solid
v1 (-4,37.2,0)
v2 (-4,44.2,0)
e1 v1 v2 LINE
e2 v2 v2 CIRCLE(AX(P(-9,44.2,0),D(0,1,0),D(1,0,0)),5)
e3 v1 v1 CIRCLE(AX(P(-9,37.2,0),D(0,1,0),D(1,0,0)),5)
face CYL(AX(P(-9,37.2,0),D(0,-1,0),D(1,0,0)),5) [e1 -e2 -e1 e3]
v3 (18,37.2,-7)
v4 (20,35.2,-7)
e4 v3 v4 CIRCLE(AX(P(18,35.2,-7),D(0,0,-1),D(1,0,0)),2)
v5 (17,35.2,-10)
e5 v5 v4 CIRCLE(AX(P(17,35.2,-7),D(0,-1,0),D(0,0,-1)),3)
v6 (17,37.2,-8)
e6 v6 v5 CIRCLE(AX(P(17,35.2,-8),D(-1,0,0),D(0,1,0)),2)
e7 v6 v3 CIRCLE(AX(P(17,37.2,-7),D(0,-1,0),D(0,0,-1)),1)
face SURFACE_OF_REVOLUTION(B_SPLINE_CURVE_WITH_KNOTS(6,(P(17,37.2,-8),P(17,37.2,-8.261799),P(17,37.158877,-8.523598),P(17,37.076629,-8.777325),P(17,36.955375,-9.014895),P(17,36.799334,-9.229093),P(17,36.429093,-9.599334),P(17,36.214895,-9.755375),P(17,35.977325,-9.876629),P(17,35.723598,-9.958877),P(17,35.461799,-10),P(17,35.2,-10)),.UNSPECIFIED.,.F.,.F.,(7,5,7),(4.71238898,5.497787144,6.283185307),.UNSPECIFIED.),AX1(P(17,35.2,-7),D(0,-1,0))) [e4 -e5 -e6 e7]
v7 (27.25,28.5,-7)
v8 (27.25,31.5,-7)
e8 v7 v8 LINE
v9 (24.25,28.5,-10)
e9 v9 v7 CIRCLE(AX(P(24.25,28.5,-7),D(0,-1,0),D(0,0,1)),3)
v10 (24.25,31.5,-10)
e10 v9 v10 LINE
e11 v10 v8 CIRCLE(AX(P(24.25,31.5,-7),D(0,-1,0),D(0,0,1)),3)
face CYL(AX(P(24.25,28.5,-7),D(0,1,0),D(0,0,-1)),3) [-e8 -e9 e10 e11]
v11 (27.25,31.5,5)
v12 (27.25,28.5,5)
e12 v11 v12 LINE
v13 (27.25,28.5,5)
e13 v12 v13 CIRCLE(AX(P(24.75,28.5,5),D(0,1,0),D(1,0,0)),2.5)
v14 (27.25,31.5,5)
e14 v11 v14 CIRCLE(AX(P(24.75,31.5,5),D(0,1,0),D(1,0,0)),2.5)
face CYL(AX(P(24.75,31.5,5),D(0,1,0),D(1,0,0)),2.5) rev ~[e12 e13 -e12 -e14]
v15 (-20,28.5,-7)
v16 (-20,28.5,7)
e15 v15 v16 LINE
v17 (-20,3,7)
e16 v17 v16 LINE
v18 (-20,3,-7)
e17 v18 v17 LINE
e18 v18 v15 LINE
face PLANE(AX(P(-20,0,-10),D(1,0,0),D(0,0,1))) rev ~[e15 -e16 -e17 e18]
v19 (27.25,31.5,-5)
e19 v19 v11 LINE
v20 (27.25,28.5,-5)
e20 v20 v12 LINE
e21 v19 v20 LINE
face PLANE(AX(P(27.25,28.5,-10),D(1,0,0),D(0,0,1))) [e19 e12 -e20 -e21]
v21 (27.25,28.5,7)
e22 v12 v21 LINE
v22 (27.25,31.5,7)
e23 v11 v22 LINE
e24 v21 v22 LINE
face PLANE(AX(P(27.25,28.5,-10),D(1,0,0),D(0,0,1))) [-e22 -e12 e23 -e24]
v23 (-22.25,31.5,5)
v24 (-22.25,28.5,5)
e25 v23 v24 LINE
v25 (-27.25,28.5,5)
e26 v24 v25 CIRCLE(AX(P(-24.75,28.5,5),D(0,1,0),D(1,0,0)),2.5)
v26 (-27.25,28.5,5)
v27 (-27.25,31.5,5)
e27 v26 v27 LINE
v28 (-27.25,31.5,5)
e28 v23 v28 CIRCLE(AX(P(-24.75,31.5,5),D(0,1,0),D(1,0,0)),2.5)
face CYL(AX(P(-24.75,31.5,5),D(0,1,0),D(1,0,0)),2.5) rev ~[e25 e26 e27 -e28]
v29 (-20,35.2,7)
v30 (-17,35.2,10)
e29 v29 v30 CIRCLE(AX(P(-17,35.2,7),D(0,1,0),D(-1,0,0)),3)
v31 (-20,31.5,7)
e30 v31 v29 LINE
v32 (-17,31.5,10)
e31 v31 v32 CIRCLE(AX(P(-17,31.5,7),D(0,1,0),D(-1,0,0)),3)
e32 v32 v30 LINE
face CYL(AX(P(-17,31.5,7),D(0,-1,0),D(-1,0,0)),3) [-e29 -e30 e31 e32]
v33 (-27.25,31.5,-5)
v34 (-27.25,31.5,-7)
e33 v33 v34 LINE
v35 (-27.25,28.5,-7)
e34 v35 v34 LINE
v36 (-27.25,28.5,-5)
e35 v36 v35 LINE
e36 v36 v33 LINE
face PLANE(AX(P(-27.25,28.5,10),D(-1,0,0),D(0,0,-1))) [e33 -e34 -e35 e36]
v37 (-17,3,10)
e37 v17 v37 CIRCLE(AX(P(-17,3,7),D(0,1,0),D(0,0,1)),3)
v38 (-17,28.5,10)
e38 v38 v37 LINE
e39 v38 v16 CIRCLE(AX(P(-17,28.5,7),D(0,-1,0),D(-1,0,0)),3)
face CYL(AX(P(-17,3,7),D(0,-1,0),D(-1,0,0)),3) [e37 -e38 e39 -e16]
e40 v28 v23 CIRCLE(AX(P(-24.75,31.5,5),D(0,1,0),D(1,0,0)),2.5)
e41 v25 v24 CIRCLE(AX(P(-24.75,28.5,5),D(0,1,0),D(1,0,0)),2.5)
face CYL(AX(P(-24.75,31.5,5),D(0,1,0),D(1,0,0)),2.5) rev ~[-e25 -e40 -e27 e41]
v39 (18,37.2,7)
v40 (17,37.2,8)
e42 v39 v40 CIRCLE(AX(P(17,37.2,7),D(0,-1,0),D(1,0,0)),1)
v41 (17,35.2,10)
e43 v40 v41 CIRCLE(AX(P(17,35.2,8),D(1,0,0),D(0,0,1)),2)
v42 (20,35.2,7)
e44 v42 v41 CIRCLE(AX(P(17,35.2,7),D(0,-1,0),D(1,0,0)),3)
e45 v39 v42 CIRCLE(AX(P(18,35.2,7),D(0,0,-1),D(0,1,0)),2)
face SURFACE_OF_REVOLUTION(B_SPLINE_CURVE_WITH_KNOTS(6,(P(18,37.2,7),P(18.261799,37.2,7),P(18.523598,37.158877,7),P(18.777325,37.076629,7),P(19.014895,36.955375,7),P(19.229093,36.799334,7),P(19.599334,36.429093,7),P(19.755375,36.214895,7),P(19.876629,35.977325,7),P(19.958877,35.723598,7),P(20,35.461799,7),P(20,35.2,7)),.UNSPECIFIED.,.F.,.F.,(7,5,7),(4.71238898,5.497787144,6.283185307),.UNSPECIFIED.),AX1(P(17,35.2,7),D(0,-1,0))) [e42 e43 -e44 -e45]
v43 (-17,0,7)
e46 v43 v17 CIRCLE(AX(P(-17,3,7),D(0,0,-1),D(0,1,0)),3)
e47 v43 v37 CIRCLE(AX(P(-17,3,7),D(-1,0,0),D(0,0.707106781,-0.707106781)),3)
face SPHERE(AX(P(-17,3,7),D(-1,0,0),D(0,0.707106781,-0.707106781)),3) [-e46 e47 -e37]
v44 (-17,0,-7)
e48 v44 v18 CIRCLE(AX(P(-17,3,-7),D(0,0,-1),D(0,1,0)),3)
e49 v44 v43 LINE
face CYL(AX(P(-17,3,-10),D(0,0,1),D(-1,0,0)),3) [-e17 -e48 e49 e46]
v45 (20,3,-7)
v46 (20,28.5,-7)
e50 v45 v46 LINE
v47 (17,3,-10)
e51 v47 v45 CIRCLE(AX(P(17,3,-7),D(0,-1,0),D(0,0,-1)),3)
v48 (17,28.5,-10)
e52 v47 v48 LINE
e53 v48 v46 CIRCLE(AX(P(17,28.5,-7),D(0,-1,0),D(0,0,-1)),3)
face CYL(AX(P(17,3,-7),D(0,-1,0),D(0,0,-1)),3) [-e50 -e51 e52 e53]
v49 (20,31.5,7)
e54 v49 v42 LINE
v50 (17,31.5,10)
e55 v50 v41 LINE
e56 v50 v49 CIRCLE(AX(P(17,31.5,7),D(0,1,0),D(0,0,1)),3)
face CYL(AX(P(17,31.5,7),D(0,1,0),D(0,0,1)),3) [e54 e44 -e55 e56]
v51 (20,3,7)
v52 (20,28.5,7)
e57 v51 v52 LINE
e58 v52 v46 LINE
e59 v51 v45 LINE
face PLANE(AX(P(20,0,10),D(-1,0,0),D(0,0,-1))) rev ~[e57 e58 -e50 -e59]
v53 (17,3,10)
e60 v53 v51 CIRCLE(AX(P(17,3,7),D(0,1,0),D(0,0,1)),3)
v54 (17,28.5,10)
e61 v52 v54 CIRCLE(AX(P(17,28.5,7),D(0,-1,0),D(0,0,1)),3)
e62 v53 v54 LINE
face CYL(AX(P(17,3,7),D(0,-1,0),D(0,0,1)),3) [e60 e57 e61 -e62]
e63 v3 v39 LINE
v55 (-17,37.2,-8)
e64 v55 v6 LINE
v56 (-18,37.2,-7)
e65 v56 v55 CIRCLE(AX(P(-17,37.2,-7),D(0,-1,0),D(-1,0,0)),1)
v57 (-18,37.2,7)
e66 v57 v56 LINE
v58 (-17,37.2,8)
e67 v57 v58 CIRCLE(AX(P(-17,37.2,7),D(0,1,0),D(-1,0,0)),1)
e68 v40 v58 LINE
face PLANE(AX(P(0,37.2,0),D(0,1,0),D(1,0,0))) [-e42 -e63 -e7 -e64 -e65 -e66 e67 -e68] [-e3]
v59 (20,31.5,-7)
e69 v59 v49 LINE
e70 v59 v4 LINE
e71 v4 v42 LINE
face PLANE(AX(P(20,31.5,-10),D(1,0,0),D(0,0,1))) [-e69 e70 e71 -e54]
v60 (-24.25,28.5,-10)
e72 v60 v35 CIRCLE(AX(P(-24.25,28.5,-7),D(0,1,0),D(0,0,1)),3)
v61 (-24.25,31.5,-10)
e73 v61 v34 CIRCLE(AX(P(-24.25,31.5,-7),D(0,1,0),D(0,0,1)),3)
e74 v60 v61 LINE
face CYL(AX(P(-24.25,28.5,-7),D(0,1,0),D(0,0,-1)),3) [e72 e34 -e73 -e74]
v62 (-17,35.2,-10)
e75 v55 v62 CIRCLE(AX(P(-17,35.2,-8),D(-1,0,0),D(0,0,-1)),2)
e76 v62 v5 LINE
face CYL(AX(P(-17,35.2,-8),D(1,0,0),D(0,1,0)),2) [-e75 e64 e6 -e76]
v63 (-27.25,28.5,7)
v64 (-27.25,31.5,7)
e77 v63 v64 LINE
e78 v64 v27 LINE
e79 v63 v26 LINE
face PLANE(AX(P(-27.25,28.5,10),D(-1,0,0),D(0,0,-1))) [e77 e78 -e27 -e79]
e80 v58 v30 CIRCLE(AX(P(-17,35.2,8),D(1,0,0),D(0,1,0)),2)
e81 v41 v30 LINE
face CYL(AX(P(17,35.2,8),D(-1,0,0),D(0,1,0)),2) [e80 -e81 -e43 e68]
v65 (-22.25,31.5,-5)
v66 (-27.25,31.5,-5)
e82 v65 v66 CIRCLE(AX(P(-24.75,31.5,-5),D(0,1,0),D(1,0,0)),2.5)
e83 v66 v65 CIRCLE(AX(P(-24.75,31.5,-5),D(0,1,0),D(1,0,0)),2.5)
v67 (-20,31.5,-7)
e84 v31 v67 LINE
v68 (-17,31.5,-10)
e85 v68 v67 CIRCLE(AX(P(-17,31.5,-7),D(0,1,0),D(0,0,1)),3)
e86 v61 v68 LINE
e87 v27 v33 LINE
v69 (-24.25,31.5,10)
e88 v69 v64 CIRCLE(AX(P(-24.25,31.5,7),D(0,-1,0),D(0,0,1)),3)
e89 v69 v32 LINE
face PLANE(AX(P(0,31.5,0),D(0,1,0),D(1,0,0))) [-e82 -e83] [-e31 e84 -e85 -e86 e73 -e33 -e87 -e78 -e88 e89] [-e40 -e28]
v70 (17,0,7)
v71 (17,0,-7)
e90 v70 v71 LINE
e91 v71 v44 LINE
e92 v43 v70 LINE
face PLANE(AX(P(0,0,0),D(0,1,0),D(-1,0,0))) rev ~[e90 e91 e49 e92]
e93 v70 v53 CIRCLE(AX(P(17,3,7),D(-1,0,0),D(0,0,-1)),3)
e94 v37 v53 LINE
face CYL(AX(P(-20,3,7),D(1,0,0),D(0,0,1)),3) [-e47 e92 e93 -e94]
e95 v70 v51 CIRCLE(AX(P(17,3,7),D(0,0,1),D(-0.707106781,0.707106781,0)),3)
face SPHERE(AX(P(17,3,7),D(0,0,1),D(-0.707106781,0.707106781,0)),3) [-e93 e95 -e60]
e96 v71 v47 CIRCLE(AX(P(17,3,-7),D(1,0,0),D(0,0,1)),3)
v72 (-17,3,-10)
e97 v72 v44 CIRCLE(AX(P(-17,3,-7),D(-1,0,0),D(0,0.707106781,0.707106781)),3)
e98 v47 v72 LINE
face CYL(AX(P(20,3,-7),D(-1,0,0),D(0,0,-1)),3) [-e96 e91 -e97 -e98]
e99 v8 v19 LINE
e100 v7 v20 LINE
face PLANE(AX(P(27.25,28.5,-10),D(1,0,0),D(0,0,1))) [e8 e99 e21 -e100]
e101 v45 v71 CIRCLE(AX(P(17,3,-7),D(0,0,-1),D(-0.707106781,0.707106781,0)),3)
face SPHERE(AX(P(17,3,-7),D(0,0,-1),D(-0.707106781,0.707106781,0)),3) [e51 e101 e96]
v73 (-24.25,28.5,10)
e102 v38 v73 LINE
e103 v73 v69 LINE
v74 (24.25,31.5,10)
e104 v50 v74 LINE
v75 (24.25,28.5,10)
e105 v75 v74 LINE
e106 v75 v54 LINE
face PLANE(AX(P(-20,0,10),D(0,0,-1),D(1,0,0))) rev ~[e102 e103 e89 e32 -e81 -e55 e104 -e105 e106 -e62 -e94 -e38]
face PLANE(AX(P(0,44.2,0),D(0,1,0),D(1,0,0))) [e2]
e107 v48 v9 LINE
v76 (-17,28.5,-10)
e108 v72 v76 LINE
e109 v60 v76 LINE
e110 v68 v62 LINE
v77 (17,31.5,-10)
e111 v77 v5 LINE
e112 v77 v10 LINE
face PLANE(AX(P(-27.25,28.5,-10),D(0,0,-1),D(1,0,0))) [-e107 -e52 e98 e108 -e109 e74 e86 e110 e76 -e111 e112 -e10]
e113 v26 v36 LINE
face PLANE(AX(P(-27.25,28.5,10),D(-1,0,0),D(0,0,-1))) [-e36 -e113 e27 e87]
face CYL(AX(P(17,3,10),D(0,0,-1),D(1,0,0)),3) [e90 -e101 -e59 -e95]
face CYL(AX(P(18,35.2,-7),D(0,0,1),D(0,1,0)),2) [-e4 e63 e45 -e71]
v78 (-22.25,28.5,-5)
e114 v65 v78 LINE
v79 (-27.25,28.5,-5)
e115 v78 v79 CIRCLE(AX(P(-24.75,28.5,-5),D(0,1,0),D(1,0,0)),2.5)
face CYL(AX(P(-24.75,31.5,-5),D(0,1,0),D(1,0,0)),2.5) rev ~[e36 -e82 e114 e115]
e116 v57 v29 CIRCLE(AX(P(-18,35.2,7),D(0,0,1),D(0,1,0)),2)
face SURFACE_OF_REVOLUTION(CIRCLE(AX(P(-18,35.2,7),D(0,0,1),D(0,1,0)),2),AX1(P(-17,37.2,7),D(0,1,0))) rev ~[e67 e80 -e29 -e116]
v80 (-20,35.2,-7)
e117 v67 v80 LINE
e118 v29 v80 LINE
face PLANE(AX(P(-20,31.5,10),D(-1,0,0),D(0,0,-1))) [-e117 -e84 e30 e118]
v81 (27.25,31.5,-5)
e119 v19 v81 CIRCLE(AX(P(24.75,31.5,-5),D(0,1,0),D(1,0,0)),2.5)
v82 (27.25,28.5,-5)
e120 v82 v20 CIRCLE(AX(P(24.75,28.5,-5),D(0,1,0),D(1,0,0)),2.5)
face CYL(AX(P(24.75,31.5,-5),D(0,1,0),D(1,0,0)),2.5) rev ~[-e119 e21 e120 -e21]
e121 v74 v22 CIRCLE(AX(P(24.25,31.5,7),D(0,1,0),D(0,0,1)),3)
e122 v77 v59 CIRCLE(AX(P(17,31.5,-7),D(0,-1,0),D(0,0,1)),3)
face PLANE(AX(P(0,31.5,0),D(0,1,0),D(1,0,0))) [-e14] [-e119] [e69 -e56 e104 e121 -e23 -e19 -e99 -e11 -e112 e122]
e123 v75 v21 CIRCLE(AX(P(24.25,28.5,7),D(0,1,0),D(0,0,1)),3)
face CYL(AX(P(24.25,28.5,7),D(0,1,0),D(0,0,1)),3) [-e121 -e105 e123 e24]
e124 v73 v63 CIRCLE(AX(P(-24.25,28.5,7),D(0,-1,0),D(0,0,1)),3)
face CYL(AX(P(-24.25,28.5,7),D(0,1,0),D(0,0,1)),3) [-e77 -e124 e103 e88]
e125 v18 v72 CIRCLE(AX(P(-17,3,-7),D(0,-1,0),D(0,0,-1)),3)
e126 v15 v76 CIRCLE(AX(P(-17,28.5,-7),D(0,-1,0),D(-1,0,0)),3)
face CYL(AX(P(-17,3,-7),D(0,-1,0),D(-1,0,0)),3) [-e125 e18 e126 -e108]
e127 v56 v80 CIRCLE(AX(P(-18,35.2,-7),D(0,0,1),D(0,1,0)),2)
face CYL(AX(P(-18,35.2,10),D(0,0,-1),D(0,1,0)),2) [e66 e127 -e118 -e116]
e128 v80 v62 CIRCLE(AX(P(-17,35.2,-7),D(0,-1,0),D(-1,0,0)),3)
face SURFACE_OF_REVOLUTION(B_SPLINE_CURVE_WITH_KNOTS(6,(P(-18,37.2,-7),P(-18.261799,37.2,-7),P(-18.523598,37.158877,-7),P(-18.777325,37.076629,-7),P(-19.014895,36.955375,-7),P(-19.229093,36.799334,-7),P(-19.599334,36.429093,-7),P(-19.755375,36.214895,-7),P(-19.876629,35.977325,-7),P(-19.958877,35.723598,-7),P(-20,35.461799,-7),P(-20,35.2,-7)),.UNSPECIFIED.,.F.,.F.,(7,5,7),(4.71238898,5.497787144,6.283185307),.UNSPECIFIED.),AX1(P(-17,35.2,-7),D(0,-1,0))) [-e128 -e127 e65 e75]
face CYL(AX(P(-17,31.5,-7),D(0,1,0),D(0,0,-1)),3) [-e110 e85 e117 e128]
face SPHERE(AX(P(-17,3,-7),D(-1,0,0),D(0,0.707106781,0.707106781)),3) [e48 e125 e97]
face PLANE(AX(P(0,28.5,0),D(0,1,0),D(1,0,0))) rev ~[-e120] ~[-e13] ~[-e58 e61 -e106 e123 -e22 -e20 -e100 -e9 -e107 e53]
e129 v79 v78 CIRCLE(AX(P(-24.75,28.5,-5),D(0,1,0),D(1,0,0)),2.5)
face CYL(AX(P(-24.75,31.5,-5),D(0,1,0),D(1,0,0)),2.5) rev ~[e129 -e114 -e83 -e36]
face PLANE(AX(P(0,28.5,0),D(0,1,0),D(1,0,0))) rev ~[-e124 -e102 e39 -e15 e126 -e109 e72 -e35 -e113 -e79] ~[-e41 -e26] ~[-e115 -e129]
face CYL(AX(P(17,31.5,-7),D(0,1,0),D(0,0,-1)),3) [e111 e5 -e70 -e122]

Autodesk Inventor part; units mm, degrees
ref_plane "YZ Plane" through (0, 0, 0) normal (1, 0, 0) x (0, 1, 0)
ref_plane "XZ Plane" through (0, 0, 0) normal (0, 1, 0) x (-1, 0, 0)
ref_plane "XY Plane" through (0, 0, 0) normal (0, 0, 1) x (1, 0, 0)
sketch "Boceto1" plane through (0, 0, 0) normal (0, 1, 0) x (-1, 0, 0)
  line L0 (20, 10) -> (-20, 10)
  line L1 (-20, 10) -> (-20, -10)
  line L2 (-20, -10) -> (20, -10)
  line L3 (20, -10) -> (20, 10)
  point P0 (0, 0)
  point P1 (-20, 0)
  dimension "d0" = 20
  dimension "d1" = 40
  dimension "d2" = 10
  dimension "d3" = 20
extrude "Extrusión1" add sketch "Boceto1" along normal blind 28.5
fillet "Empalme1" radius 3 4 edges at (0, 0, 10) (20, 0, 0) (0, 0, -10) (-20, 0, 0)
fillet "Empalme2" radius 3 6 edges at (-20, 15.75, -10) (-19.1213, 0.8787, -9.1213) (-20, 15.75, 10) (-19.1213, 0.8787, 9.1213) (20, 15.75, 10) (19.1213, 0.8787, 9.1213)
fillet "Empalme3" radius 3 2 edges at (20, 15.75, -10) (19.1213, 0.8787, -9.1213)
sketch "Boceto2" plane through (0, 28.5, 0) normal (0, 1, 0) x (1, 0, 0)
  line L0 (-27.25, 10) -> (27.25, 10)
  line L1 (27.25, 10) -> (27.25, -10)
  line L2 (27.25, -10) -> (-27.25, -10)
  line L3 (-27.25, -10) -> (-27.25, 10)
  line L4 (17, 10) -> (-17, 10) projected
  line L5 (-17, -10) -> (17, -10) projected
  point P0 (0, 0)
  dimension "d9" = 0
  dimension "d10" = 0
  dimension "d11" = 54.5
  dimension "d12" = 27.25
extrude "Extrusión2" add sketch "Boceto2" along normal blind 3
fillet "Empalme4" radius 3 3 edges at (-27.25, 30, 10) (-27.25, 30, -10) (27.25, 30, 10)
fillet "Empalme5" radius 3 1 edges at (27.25, 30, -10)
sketch "Boceto3" plane through (0, 31.5, 0) normal (0, 1, 0) x (1, 0, 0)
  line L0 (-17, 10) -> (17, 10) projected
  line L1 (-24.25, -10) -> (24.25, -10) projected
  line L2 (-20, 10) -> (20, 10)
  line L3 (20, 10) -> (20, -10)
  line L4 (20, -10) -> (-20, -10)
  line L5 (-20, -10) -> (-20, 10)
  point P0 (0, 0)
  dimension "d17" = 20
  dimension "d18" = 20
extrude "Extrusión3" add sketch "Boceto3" along normal blind 5.7
fillet "Empalme6" radius 3 3 edges at (20, 34.35, -10) (20, 34.35, 10) (-20, 34.35, -10)
fillet "Empalme7" radius 2 7 edges at (-20, 37.2, 1.5) (-19.1213, 37.2, -9.1213) (0, 37.2, -10) (19.1213, 37.2, -9.1213) (20, 37.2, 0) (19.1213, 37.2, 9.1213) (-1.5, 37.2, 10)
fillet "Empalme8" radius 3 2 edges at (-20, 33.35, 10) (-19.4142, 36.6142, 9.4142)
sketch "Boceto4" plane through (0, 31.5, 0) normal (0, 1, 0) x (1, 0, 0)
  circle A0 centre (-24.75, 5) radius 2.5
  line L0 (-38.2556, 0) -> (37.7734, 0)
  line L1 (0, 20.4997) -> (0, -23.7455)
  circle A1 centre (-24.75, -5) radius 2.5
  circle A2 centre (24.75, 5) radius 2.5
  circle A3 centre (24.75, -5) radius 2.5
  point P0 (0, 0)
  dimension "d24" = 24.75
  dimension "d25" = 5
  dimension "d26" = 5
  dimension "d27" = 24.75
extrude "Extrusión4" cut sketch "Boceto4" against normal blind 5
sketch "Boceto5" plane through (0, 37.2, 0) normal (0, 1, 0) x (1, 0, 0)
  circle A0 centre (-9, 0) radius 5
  point P0 (0, 0)
  dimension "d30" = 10
  dimension "d31" = 9
extrude "Extrusión5" add sketch "Boceto5" along normal blind 7
equation "\"Radio_pliegue\" = Grosor"
equation "\"Anchura_desahogo_plegado\" = Grosor"
equation "\"Profundidad_desahogo_plegado\" = 0.5 * Grosor"
equation "\"Tamaño_destalonado\" = 4 * Grosor"
equation "\"Remanente_mínimo\" = 2 * Grosor"
equation "\"Radiodetransición\" = Radio_pliegue"
equation "\"Tamaño_de_radio_de_Jacobi\" = Radio_pliegue"
equation "\"TamañoSeparación\" = Grosor"
equation "\"Grosor\" = 0.5"
properties part number "Feedback 360"
